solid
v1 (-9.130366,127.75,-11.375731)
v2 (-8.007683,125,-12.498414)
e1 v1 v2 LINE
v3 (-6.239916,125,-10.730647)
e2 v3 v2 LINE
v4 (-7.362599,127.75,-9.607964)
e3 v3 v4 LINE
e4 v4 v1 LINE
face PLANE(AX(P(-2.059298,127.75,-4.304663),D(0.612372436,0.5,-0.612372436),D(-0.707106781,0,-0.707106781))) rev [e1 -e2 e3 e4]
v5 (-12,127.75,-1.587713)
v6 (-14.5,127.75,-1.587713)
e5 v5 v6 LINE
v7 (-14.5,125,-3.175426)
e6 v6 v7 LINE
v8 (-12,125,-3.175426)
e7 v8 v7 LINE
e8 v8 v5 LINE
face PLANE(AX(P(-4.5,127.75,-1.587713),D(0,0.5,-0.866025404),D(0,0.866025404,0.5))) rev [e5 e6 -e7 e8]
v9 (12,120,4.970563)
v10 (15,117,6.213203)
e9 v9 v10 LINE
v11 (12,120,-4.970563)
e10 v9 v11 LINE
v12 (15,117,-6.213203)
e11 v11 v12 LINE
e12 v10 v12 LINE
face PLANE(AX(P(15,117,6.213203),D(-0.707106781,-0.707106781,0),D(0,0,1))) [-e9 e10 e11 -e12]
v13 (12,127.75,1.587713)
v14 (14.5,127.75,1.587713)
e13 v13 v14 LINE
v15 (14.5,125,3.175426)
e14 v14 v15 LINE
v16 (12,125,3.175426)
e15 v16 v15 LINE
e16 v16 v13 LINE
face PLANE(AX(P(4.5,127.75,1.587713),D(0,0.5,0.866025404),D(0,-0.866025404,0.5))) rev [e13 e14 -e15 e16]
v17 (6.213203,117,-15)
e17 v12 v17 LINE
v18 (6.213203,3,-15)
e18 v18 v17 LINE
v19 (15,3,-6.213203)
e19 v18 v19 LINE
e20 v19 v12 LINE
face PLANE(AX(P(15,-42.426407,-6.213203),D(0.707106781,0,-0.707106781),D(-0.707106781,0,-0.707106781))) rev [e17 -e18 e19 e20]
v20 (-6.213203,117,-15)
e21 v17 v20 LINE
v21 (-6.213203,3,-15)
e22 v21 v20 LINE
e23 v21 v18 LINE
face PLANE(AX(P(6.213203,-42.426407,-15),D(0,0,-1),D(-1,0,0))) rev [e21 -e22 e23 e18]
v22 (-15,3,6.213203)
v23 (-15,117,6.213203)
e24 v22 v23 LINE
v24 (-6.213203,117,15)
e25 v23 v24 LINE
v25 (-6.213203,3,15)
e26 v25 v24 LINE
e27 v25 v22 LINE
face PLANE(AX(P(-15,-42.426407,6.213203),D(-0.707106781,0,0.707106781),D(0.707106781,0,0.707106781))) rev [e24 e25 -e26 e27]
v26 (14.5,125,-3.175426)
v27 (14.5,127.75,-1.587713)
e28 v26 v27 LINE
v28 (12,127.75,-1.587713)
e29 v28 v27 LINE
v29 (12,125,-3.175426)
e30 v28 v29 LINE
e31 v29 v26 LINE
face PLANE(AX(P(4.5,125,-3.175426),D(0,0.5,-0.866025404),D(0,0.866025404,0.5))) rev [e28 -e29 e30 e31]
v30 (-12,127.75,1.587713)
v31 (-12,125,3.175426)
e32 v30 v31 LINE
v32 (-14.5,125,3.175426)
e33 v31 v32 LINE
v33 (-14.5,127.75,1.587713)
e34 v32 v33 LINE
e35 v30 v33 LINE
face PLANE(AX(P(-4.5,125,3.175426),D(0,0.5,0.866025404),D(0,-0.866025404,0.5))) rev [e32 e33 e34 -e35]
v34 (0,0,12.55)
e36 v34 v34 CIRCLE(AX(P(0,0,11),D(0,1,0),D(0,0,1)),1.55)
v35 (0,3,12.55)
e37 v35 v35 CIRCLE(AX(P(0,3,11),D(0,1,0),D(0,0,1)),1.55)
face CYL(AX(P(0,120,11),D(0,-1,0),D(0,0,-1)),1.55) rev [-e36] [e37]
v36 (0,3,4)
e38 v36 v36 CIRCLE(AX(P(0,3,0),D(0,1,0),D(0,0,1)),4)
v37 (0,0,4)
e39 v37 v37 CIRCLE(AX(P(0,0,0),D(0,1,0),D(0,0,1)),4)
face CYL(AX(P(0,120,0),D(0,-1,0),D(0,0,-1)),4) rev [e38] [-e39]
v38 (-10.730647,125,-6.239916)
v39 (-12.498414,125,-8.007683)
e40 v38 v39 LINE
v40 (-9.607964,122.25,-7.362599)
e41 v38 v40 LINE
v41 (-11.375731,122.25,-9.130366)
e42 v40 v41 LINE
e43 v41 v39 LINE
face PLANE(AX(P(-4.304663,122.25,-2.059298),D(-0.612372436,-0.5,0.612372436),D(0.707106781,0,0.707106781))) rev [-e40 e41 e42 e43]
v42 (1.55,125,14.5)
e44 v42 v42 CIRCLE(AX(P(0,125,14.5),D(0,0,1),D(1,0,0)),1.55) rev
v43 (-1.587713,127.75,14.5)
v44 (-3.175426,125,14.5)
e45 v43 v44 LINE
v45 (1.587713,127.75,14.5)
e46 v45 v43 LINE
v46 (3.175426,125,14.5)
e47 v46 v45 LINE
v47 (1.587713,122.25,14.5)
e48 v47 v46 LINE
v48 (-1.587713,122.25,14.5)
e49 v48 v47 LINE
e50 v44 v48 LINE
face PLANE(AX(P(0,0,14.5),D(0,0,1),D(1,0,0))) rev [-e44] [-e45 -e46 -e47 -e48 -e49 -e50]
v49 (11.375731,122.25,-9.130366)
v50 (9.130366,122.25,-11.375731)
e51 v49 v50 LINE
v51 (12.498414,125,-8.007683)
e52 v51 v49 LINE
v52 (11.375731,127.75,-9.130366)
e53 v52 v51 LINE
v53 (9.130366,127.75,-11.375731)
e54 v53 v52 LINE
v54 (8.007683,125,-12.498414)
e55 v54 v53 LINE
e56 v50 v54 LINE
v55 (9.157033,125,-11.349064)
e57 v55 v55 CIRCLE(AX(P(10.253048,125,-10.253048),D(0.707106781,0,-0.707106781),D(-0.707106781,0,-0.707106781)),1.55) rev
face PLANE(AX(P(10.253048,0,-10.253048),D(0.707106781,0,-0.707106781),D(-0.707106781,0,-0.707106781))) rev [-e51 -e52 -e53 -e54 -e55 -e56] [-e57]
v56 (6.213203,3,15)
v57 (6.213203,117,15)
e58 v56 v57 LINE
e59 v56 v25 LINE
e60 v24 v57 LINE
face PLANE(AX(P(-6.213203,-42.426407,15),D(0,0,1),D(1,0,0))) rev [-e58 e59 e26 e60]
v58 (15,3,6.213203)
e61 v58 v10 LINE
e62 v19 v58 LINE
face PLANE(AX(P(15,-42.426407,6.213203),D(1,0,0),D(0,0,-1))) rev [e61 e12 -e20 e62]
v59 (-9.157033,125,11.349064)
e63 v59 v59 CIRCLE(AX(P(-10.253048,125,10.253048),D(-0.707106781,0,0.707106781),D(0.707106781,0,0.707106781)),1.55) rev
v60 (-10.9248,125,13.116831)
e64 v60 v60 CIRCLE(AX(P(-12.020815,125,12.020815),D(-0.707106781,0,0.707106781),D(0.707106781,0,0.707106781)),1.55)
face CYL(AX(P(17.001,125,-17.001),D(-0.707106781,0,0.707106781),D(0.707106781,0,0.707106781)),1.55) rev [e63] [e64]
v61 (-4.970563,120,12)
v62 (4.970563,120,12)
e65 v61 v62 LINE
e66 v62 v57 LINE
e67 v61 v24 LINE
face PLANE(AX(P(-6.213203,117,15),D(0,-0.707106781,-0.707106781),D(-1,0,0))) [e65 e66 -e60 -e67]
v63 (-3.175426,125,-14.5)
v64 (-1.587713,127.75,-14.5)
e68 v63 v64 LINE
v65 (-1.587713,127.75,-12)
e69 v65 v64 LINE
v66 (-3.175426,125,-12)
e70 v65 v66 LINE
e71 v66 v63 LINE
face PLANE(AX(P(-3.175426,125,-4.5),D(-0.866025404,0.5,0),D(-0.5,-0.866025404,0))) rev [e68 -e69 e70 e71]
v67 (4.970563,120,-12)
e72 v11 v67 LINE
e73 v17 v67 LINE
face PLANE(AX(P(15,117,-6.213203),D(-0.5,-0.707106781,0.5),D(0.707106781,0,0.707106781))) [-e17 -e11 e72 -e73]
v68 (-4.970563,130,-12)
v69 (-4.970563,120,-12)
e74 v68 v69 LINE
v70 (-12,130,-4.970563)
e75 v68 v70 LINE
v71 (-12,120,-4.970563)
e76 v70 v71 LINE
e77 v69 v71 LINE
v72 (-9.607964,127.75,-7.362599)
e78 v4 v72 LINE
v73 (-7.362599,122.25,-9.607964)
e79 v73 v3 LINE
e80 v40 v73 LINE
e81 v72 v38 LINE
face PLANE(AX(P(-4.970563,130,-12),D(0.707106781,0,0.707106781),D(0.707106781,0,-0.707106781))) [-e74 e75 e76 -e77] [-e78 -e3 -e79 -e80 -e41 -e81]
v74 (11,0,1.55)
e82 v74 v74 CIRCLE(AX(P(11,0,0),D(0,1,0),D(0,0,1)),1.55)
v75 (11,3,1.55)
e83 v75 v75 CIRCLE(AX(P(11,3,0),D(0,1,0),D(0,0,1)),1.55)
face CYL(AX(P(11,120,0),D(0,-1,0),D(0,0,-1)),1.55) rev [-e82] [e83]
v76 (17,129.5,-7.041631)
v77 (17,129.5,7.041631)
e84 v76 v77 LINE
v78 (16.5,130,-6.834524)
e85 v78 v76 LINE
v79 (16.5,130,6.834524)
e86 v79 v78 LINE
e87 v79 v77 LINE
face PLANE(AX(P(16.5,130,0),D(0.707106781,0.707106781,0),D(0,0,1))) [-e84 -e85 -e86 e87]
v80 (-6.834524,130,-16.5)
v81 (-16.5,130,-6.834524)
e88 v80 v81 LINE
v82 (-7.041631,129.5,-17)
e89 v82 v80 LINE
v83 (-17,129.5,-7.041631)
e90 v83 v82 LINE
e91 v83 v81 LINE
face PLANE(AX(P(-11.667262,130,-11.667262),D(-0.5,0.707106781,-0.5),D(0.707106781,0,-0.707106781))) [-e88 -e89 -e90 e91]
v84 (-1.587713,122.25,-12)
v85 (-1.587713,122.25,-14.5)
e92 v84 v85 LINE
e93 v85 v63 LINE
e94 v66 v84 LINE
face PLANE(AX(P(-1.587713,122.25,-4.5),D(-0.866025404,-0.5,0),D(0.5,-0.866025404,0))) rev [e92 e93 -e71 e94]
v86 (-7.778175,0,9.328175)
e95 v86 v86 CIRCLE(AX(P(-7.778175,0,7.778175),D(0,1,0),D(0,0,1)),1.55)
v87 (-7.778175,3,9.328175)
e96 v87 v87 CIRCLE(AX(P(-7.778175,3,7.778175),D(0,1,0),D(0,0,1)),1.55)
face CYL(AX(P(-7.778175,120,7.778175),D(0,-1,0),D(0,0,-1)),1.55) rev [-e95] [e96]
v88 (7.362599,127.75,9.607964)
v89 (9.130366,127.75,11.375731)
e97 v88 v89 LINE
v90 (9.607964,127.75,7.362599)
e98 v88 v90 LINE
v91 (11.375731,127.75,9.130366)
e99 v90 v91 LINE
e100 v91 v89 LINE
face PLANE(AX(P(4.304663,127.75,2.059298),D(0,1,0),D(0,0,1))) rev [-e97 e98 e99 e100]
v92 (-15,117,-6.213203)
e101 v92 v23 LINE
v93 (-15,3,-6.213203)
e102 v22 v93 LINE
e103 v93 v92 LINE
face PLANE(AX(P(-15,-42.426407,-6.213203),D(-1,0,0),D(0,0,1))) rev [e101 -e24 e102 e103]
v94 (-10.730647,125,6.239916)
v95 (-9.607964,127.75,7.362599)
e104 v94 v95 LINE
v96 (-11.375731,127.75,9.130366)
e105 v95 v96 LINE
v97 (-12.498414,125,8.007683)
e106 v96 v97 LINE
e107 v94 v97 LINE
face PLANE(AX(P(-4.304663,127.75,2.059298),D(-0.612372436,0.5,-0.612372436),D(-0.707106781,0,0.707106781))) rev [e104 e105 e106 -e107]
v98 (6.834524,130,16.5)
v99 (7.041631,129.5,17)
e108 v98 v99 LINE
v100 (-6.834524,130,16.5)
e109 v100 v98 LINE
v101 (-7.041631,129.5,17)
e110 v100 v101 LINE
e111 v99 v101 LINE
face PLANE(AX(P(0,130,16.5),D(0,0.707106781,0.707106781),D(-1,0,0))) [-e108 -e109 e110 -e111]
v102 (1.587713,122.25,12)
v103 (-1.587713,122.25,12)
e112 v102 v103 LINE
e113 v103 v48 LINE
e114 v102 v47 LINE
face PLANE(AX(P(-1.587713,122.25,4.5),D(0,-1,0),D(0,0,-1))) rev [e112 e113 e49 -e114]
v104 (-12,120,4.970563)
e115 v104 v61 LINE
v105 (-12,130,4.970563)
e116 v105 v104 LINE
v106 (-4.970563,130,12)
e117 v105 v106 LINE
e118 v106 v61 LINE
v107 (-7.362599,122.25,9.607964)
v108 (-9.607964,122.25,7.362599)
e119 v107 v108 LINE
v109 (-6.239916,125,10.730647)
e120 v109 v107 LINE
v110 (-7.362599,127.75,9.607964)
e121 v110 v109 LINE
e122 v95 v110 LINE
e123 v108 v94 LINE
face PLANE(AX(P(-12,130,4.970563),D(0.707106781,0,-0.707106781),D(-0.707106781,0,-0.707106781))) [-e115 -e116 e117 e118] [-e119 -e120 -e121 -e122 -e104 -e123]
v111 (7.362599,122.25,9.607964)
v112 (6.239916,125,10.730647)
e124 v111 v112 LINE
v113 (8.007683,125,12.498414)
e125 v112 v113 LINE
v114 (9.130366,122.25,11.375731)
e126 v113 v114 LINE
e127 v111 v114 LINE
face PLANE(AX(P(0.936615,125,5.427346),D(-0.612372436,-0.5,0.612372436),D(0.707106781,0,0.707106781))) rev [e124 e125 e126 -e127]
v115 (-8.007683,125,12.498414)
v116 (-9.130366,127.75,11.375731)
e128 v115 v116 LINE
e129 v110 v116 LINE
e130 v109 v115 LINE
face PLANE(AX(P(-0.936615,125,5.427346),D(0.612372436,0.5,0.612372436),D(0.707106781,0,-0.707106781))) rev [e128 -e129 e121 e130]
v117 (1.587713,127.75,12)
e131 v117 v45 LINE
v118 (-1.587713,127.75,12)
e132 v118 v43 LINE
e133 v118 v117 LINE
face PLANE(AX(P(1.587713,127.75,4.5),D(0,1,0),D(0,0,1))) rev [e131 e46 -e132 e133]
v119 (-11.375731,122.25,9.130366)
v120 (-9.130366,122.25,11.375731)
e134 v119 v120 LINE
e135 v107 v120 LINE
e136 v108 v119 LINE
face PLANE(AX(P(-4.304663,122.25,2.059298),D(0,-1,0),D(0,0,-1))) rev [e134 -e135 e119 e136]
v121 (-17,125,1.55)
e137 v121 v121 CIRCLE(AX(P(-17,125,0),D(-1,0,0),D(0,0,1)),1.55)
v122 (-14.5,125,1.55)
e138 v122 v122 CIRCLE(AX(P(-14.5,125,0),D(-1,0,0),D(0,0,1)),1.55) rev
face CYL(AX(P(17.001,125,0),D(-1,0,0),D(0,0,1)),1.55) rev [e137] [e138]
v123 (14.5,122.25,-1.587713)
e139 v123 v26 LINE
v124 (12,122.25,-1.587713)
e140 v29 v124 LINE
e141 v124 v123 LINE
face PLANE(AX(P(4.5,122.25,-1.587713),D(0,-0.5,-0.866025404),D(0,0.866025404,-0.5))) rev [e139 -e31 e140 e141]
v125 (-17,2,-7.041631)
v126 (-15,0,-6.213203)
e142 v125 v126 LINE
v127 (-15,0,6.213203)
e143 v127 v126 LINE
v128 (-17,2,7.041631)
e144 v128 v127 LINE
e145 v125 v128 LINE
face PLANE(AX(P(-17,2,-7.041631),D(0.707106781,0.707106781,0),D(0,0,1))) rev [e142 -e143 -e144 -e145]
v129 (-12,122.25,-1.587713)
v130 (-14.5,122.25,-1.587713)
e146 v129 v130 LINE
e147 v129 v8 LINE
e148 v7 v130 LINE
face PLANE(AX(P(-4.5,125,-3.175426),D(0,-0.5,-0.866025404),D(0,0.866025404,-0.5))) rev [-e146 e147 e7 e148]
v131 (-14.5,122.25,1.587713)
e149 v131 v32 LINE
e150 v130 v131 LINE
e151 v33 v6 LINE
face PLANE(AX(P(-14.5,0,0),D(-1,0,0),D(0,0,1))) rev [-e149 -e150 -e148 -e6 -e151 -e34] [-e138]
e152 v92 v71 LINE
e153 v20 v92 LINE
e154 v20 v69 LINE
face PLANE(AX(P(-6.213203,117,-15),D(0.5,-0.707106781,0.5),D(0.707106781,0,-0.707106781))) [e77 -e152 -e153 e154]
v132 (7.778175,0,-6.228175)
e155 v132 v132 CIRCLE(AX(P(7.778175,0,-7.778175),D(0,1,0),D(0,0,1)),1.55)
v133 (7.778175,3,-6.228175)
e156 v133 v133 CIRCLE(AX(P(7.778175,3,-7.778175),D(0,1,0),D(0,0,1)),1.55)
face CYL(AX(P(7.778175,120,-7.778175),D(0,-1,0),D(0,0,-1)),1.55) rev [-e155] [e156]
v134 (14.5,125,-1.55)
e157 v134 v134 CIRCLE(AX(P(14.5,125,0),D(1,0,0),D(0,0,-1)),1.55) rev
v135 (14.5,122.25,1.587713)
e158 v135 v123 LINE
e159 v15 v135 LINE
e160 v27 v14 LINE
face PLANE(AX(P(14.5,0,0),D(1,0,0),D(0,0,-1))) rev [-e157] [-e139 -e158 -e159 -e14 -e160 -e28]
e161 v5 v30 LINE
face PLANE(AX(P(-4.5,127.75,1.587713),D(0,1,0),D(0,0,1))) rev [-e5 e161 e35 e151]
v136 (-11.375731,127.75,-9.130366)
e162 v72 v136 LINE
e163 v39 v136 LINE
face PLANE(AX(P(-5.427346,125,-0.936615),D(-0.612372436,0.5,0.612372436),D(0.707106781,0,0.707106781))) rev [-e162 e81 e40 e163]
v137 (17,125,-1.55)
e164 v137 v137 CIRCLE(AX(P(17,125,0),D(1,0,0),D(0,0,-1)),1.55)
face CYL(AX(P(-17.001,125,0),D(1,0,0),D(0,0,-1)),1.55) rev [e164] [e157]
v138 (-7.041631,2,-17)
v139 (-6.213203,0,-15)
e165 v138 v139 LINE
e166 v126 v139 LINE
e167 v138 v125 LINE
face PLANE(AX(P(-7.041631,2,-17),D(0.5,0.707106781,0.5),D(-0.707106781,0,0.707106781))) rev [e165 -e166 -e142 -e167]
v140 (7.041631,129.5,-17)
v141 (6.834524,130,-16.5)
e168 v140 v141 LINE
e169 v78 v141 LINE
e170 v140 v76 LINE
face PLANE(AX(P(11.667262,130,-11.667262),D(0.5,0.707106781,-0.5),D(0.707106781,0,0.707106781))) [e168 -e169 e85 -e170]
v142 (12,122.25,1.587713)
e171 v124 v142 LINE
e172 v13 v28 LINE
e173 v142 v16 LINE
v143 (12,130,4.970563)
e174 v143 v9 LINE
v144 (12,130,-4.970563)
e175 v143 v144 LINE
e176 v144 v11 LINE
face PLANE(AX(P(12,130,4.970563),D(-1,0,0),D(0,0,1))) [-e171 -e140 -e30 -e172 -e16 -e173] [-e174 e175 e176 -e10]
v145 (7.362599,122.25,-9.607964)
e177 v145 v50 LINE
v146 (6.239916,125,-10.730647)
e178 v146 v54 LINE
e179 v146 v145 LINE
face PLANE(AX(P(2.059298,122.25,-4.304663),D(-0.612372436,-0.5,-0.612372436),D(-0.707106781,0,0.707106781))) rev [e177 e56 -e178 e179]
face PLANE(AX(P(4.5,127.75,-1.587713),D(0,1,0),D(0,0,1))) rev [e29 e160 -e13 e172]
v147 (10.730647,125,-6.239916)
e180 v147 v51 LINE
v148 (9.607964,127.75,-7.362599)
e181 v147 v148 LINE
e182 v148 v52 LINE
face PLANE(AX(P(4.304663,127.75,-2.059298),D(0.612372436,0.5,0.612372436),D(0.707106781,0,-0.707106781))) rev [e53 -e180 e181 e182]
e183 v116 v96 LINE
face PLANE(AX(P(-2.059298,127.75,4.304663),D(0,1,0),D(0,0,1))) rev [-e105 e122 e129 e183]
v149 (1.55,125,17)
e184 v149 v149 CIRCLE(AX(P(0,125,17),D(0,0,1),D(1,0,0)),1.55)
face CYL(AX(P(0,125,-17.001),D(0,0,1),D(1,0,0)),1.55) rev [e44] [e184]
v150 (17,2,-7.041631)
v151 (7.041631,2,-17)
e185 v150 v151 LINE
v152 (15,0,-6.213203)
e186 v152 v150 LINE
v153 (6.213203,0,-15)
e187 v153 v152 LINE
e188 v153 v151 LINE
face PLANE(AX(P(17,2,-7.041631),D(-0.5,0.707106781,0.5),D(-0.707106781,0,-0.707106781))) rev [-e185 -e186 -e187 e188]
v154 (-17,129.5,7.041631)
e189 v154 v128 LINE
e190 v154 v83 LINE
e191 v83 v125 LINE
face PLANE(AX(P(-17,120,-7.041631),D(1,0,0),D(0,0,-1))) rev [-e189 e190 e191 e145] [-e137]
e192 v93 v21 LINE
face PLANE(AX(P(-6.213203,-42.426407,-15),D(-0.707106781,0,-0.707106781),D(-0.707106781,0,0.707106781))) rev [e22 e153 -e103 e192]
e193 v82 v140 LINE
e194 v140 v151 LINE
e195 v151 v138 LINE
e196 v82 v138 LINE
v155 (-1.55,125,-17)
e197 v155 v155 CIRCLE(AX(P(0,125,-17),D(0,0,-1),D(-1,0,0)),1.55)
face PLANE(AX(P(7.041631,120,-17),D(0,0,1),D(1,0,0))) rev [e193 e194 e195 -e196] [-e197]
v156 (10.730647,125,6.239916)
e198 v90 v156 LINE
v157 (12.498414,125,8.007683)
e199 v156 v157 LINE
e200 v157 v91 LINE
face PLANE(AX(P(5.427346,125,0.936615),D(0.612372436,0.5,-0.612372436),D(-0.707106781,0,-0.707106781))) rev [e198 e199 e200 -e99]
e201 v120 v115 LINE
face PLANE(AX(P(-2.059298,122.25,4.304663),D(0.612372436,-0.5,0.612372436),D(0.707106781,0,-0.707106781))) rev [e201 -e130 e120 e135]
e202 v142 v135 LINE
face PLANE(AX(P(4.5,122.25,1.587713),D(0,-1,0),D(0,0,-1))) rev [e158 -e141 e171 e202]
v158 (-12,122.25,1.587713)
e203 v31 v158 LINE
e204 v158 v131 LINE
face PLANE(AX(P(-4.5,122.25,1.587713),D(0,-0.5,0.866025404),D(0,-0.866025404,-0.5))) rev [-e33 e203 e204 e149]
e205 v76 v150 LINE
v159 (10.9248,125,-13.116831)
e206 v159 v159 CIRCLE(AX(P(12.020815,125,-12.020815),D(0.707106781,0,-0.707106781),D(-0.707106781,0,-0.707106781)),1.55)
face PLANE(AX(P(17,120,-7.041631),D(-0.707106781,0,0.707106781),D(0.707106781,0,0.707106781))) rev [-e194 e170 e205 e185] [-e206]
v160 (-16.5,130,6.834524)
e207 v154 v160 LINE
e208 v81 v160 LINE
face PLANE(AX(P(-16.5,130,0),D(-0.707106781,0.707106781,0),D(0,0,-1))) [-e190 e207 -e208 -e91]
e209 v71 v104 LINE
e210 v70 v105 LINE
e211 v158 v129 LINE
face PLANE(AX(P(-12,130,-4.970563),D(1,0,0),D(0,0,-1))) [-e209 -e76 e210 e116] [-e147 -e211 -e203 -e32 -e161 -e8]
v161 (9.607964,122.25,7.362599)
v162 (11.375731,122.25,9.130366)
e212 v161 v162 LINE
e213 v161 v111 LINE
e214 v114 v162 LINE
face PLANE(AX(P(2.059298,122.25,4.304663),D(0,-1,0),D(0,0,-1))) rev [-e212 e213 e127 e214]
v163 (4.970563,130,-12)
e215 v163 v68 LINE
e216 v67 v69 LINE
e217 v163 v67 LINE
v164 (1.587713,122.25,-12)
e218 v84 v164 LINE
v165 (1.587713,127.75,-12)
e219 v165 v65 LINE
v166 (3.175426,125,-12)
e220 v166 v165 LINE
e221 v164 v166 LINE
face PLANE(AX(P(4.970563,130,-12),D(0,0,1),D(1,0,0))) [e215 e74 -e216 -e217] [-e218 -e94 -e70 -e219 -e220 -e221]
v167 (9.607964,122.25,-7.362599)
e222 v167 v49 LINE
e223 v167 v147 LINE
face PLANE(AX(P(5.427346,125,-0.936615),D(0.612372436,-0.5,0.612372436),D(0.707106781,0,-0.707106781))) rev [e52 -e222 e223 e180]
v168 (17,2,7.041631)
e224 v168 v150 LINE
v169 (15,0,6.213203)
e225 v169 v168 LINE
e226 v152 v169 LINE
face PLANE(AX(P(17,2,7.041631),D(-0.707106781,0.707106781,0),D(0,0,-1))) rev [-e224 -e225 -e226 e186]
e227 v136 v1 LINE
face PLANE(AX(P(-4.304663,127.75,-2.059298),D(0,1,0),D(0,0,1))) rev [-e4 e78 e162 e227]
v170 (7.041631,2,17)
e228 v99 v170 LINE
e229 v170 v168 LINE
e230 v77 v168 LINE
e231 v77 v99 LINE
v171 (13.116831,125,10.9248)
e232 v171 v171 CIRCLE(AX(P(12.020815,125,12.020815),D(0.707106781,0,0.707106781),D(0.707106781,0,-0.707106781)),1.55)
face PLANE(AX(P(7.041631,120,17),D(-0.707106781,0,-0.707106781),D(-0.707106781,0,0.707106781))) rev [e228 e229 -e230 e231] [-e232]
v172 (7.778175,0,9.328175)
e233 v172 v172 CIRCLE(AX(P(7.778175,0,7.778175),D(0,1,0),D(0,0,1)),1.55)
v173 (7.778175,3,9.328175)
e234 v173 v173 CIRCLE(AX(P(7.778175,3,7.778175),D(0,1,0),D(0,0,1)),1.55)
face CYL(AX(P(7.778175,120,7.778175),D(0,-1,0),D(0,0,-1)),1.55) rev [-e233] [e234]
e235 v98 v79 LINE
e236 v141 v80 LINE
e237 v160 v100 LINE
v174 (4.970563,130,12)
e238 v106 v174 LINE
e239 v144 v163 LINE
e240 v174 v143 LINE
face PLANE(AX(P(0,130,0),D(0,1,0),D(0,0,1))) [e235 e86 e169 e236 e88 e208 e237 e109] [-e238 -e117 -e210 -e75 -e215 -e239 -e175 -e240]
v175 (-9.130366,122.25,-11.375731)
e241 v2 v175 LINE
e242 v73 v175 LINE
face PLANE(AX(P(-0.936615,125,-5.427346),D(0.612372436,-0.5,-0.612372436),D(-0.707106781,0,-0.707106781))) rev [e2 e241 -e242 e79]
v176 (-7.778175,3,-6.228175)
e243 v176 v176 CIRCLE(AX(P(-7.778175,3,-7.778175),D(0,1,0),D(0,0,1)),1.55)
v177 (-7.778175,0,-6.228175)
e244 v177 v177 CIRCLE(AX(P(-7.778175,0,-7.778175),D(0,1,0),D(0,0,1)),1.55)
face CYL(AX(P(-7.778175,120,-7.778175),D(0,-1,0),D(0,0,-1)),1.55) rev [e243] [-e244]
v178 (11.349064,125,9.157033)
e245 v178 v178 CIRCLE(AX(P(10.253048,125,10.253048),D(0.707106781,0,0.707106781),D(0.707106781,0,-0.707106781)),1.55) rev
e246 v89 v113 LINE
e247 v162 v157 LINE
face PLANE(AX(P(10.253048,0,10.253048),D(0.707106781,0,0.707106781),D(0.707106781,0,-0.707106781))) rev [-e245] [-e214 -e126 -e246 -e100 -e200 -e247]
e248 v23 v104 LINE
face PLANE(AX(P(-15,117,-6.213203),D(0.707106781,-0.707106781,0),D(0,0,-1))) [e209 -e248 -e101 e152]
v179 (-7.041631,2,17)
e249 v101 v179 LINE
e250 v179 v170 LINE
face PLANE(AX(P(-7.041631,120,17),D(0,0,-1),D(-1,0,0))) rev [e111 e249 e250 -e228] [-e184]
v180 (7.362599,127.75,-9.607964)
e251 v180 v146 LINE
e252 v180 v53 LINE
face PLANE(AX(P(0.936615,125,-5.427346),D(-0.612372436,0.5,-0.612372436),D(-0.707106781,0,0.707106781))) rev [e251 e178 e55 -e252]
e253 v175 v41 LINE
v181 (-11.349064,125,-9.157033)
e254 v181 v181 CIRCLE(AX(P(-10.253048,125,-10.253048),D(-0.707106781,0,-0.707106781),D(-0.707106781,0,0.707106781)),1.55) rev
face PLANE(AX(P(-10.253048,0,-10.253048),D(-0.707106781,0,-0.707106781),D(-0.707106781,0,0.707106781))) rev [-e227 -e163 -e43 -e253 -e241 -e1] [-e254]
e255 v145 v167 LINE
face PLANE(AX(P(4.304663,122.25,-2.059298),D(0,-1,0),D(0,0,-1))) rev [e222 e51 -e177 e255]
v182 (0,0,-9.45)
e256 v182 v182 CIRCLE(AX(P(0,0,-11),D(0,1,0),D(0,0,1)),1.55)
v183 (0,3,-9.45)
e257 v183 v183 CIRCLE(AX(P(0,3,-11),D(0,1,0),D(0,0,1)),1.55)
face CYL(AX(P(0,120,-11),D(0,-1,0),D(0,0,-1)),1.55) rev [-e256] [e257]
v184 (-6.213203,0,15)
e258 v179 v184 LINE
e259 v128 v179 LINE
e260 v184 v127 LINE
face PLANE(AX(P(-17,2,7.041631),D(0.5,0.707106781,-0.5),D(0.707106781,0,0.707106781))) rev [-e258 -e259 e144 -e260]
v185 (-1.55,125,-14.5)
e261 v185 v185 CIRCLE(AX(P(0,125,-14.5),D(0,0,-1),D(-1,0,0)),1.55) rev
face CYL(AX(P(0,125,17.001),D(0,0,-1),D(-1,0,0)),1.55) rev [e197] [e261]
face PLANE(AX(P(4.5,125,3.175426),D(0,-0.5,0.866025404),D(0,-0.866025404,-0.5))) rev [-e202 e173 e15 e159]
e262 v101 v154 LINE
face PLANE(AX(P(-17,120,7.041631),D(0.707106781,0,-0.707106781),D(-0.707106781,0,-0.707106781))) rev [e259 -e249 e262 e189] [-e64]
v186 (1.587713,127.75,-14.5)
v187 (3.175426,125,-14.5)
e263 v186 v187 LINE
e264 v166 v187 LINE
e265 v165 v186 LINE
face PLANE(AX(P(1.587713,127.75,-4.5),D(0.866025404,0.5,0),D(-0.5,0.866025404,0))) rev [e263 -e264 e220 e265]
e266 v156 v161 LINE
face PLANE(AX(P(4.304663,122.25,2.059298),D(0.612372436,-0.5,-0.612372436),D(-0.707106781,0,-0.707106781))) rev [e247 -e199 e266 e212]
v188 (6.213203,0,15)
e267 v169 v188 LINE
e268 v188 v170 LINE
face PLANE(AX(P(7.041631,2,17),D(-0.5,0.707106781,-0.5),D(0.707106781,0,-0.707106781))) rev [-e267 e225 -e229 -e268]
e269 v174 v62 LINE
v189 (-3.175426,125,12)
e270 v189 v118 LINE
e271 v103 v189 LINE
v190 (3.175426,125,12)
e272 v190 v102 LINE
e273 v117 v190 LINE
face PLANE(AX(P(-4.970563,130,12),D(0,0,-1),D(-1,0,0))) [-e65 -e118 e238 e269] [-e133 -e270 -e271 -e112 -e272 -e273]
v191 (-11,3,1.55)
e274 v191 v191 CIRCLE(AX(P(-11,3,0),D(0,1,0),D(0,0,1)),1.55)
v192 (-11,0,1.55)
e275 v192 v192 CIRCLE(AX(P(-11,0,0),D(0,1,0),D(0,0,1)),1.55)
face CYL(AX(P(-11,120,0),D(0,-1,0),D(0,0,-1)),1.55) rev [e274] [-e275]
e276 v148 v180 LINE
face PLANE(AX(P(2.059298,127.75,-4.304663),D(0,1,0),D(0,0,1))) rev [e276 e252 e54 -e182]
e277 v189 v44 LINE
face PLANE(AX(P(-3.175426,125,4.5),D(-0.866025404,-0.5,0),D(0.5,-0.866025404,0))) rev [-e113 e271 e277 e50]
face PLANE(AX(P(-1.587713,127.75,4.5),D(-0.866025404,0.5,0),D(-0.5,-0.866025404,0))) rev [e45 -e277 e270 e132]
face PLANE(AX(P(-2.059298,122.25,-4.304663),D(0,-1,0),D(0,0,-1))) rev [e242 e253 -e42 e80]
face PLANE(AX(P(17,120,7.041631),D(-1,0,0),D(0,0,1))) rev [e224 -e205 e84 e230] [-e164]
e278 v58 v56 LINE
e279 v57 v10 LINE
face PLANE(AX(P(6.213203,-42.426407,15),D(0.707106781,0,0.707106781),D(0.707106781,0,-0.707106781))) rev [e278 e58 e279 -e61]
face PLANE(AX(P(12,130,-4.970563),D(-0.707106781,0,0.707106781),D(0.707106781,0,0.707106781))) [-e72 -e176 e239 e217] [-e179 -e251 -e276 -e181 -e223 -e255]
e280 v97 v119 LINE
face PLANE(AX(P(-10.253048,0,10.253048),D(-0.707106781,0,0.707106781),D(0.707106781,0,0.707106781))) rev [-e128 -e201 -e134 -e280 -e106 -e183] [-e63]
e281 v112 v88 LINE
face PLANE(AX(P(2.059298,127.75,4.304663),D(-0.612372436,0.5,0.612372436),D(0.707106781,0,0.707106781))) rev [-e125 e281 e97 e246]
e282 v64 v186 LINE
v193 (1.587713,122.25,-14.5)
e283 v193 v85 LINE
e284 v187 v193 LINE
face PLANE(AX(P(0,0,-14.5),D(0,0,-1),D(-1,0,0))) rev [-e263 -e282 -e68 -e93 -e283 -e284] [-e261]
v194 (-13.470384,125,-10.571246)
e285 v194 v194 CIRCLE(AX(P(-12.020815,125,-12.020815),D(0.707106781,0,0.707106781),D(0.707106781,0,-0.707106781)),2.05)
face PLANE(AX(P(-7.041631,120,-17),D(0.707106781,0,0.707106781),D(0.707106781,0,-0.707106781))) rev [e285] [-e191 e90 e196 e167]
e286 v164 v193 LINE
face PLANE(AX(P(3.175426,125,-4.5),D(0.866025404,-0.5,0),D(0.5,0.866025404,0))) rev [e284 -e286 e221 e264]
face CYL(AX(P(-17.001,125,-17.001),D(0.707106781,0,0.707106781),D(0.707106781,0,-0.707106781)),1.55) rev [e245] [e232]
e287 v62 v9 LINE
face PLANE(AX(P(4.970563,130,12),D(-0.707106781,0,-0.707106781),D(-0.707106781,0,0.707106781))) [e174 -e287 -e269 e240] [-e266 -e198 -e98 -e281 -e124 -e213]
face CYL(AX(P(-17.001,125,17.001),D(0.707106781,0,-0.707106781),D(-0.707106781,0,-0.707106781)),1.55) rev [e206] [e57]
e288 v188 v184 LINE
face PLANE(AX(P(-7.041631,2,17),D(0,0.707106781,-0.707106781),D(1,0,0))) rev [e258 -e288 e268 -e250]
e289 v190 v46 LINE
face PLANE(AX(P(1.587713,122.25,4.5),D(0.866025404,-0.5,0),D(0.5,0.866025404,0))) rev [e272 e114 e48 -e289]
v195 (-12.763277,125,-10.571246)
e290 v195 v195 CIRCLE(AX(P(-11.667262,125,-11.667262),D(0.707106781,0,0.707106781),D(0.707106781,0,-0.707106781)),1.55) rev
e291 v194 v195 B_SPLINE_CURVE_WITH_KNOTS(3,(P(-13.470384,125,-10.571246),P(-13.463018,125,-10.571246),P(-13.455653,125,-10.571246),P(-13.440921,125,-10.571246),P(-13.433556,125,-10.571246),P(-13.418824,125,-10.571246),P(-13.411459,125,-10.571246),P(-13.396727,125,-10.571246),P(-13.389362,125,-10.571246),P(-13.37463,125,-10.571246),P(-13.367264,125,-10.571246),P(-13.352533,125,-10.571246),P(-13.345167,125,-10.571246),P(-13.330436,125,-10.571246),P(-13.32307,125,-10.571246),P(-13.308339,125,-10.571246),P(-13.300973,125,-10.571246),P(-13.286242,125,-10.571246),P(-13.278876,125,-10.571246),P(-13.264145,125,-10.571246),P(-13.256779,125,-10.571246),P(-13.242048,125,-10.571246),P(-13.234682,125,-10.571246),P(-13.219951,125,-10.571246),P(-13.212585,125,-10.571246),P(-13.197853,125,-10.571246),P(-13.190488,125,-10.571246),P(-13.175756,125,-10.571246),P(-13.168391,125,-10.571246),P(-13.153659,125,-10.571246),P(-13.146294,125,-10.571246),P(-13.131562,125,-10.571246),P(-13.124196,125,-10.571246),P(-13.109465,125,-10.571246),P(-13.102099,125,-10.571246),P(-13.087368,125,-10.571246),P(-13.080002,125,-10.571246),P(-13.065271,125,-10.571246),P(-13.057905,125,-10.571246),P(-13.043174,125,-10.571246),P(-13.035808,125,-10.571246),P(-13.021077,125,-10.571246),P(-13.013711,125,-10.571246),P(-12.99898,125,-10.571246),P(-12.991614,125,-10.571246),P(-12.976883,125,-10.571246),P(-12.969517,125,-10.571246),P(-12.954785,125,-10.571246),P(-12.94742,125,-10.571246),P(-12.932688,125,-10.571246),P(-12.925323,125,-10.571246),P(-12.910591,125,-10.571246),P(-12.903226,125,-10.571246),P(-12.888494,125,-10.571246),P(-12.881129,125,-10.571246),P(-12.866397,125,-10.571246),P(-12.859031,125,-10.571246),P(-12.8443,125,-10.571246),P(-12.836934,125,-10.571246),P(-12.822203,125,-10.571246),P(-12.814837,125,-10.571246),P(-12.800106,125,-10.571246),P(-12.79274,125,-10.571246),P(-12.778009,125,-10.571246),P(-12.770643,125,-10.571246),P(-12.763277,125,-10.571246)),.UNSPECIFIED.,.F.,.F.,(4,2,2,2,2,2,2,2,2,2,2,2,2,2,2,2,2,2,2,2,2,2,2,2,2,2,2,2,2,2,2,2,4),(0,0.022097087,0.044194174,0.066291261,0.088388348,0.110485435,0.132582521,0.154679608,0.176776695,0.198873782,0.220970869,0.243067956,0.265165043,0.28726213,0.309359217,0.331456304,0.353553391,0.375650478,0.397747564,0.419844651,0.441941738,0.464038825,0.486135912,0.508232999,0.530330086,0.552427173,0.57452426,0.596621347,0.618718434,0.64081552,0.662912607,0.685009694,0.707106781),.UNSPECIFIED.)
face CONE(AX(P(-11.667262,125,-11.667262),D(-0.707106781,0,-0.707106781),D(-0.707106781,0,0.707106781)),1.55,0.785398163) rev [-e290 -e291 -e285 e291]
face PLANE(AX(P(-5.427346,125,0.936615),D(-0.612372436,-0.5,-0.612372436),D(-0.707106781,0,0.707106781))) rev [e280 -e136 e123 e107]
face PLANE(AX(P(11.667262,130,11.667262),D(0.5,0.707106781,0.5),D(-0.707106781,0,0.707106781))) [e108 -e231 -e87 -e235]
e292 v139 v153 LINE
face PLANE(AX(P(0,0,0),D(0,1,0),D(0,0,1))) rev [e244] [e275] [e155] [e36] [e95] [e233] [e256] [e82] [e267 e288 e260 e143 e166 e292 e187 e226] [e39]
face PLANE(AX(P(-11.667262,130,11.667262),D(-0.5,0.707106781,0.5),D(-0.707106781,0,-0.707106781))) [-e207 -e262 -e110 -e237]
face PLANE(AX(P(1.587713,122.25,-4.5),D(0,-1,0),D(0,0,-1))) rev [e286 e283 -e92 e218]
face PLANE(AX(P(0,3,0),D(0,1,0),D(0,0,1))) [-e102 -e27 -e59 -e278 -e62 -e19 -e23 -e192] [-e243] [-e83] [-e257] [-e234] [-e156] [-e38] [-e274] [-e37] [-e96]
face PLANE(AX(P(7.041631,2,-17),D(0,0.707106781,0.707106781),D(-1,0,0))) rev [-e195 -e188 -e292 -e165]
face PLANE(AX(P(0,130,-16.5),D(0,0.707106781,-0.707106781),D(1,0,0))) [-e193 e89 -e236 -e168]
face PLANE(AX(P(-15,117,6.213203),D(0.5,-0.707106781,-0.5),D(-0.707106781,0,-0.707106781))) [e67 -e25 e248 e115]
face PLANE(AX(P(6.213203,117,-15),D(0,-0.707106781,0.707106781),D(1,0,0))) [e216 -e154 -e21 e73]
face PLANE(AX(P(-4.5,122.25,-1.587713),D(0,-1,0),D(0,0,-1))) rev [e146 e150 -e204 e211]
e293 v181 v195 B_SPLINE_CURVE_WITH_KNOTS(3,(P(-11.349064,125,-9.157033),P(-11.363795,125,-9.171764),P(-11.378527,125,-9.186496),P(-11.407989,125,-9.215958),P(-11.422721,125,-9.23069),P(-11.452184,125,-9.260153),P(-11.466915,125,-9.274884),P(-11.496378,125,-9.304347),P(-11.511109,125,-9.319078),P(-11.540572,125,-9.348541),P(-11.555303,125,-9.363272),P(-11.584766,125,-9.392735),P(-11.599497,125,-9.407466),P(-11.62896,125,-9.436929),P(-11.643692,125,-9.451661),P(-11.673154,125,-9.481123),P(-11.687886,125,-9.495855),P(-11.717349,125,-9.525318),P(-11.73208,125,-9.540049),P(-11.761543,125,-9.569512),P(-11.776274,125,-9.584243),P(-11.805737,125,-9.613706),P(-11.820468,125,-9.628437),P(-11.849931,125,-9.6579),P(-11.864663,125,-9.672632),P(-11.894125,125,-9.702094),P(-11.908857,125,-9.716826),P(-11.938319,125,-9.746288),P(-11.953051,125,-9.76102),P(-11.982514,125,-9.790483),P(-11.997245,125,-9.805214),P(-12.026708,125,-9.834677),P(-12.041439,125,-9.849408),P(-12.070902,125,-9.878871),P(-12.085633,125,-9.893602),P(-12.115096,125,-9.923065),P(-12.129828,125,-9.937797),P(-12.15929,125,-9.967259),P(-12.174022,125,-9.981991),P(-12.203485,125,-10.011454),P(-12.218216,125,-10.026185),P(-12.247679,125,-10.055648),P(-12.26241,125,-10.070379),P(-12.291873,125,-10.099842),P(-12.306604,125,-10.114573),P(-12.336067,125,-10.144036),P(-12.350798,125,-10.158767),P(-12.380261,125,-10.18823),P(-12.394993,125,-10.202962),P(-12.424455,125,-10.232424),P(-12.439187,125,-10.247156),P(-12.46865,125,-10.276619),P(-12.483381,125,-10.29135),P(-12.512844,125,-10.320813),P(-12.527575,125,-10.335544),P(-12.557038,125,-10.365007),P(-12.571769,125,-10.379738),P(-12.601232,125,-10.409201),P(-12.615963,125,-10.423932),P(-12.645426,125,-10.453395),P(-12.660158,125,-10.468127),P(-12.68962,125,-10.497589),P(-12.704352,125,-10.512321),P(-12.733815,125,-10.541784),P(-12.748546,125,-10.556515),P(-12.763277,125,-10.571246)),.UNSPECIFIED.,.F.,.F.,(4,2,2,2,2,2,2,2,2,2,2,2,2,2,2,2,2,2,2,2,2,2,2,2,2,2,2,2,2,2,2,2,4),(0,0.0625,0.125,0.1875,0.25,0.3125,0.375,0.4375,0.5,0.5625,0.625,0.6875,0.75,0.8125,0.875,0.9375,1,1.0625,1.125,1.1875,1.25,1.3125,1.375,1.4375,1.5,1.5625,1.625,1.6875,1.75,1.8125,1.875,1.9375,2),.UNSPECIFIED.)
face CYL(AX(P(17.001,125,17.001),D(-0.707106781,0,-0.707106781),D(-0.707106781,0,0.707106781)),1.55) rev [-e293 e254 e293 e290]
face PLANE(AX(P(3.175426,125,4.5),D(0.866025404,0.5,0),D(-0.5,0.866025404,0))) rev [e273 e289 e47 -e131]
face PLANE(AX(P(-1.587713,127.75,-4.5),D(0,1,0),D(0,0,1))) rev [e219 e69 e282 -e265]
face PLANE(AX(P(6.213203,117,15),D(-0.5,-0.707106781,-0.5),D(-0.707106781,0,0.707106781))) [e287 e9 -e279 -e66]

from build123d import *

# Parameters (mm, degrees)
CROQUIS1_R              = 1.55
CROQUIS1_R_2            = 4
SALIENTE_EXTRUIR1_DEPTH = 120
CORTAR_EXTRUIR1_DEPTH   = 117
SALIENTE_EXTRUIR2_DEPTH = 10
CHAFL_N2_SIZE           = 3
CORTAR_EXTRUIR2_REACH   = 138.325
CROQUIS4_R              = 1.55
CHAFL_N3_SIZE           = 0.5
CORTAR_EXTRUIR3_START   = -2.5
CORTAR_EXTRUIR3_DEPTH   = 10
MATRIZC5_COUNT          = 8
CHAFL_N1_SIZE           = 2
CHAFL_N4_SIZE           = 0.5


with BuildPart() as part:
    # Croquis1 → Saliente-Extruir1 (new body)
    with BuildSketch(Plane(origin=(0, 0, 0), x_dir=(1, 0, 0), z_dir=(0, 1, 0))):
        Polygon((17, -7.04163056), (17, 7.04163056), (7.04163056, 17), (-7.04163056, 17), (-17, 7.04163056), (-17, -7.04163056), (-7.04163056, -17), (7.04163056, -17), align=None)
        with Locations(Location((0, 11, 0), (0, 0, 270))):
            Circle(CROQUIS1_R, mode=Mode.SUBTRACT)
        with Locations(Location((0, 0, 0), (0, 0, 270))):
            Circle(CROQUIS1_R_2, mode=Mode.SUBTRACT)
        with Locations(Location((7.778174593, 7.778174593, 0), (0, 0, 270))):
            Circle(CROQUIS1_R, mode=Mode.SUBTRACT)
        with Locations(Location((11, 0, 0), (0, 0, 270))):
            Circle(CROQUIS1_R, mode=Mode.SUBTRACT)
        with Locations(Location((7.778174593, -7.778174593, 0), (0, 0, 270))):
            Circle(CROQUIS1_R, mode=Mode.SUBTRACT)
        with Locations(Location((0, -11, 0), (0, 0, 270))):
            Circle(CROQUIS1_R, mode=Mode.SUBTRACT)
        with Locations(Location((-7.778174593, -7.778174593, 0), (0, 0, 270))):
            Circle(CROQUIS1_R, mode=Mode.SUBTRACT)
        with Locations(Location((-11, 0, 0), (0, 0, 270))):
            Circle(CROQUIS1_R, mode=Mode.SUBTRACT)
        with Locations(Location((-7.778174593, 7.778174593, 0), (0, 0, 270))):
            Circle(CROQUIS1_R, mode=Mode.SUBTRACT)
    extrude(amount=SALIENTE_EXTRUIR1_DEPTH)

    # Croquis2 → Cortar-Extruir1 (cut)
    with BuildSketch(Plane(origin=(0, 120, 0), x_dir=(1, 0, 0), z_dir=(0, 1, 0))):
        Polygon((6.213203436, 15), (-6.213203436, 15), (-15, 6.213203436), (-15, -6.213203436), (-6.213203436, -15), (6.213203436, -15), (15, -6.213203436), (15, 6.213203436), align=None)
    extrude(amount=-CORTAR_EXTRUIR1_DEPTH, mode=Mode.SUBTRACT)

    # Croquis3 → Saliente-Extruir2 (add)
    with BuildSketch(Plane(origin=(0, 120, 0), x_dir=(1, 0, 0), z_dir=(0, 1, 0))):
        Polygon((7.04163056, 17), (-7.04163056, 17), (-17, 7.04163056), (-17, -7.04163056), (-7.04163056, -17), (7.04163056, -17), (17, -7.04163056), (17, 7.04163056), align=None)
        Polygon((12, -4.970562748), (12, 4.970562748), (4.970562748, 12), (-4.970562748, 12), (-12, 4.970562748), (-12, -4.970562748), (-4.970562748, -12), (4.970562748, -12), align=None, mode=Mode.SUBTRACT)
    extrude(amount=SALIENTE_EXTRUIR2_DEPTH)

    # Chaflán2
    chafl_n2_edges = [part.edges().sort_by_distance(p)[0] for p in [
        (10.606601718, 120, -10.606601718),
        (0, 120, -15),
        (-10.606601718, 120, -10.606601718),
        (-15, 120, 0),
        (-10.606601718, 120, 10.606601718),
        (0, 120, 15),
        (10.606601718, 120, 10.606601718),
        (15, 120, 0),
    ]]
    chamfer(chafl_n2_edges, length=CHAFL_N2_SIZE - 0.0001)  # a hair under: the kernel refuses the full size

    # Croquis4 → Cortar-Extruir2 (cut, up to next)
    with BuildSketch(Plane(origin=(-12.02081528, 0, -12.02081528), x_dir=(-0.7071067811865472, 0, 0.7071067811865478), z_dir=(-0.7071067811865478, 0, -0.7071067811865472)), mode=Mode.PRIVATE) as cortar_extruir2_sk1:
        with Locations((0, 125)):
            Circle(CROQUIS4_R)
    cortar_extruir2_tool1 = extrude(cortar_extruir2_sk1.sketch, amount=-CORTAR_EXTRUIR2_REACH, mode=Mode.PRIVATE) & part.part
    cortar_extruir2 = cortar_extruir2_tool1.solids().sort_by_distance((-12.020815, 125, -12.020815))[0]
    add(cortar_extruir2, mode=Mode.SUBTRACT)

    # Chaflán3
    chafl_n3_edges = [part.edges().sort_by_distance(p)[0] for p in [
        (-10.924799769, 125, -13.116830791),
    ]]
    chamfer(chafl_n3_edges, length=CHAFL_N3_SIZE)

    # Croquis5 → Cortar-Extruir3 (cut)
    with BuildSketch(Plane(origin=(-12.02081528, 0, -12.02081528), x_dir=(-0.7071067811865471, 0, 0.7071067811865479), z_dir=(-0.7071067811865479, 0, -0.7071067811865471)).offset(CORTAR_EXTRUIR3_START)):
        Polygon((3.175426481, 125), (1.58771324, 127.75), (-1.58771324, 127.75), (-3.175426481, 125), (-1.58771324, 122.25), (1.58771324, 122.25), align=None)
    cortar_extruir3 = extrude(amount=-CORTAR_EXTRUIR3_DEPTH, mode=Mode.SUBTRACT)

    # MatrizC5: Cortar-Extruir2, Cortar-Extruir3 ×8 about axis
    matrizc5_axis = Axis((0, 0, 0), (0, 1, 0))
    add([cortar_extruir2.rotate(matrizc5_axis, i * 360 / MATRIZC5_COUNT) for i in range(1, MATRIZC5_COUNT)], mode=Mode.SUBTRACT)
    add([cortar_extruir3.rotate(matrizc5_axis, i * 360 / MATRIZC5_COUNT) for i in range(1, MATRIZC5_COUNT)], mode=Mode.SUBTRACT)

    # Chaflán1
    chafl_n1_edges = [part.edges().sort_by_distance(p)[0] for p in [
        (17, 0, 0),
        (12.02081528, 0, 12.02081528),
        (0, 0, 17),
        (-12.02081528, 0, 12.02081528),
        (-17, 0, 0),
        (-12.02081528, 0, -12.02081528),
        (0, 0, -17),
        (12.02081528, 0, -12.02081528),
    ]]
    chamfer(chafl_n1_edges, length=CHAFL_N1_SIZE)

    # Chaflán4
    chafl_n4_edges = [part.edges().sort_by_distance(p)[0] for p in [
        (12.02081528, 130, -12.02081528),
        (0, 130, -17),
        (-12.02081528, 130, -12.02081528),
        (-17, 130, 0),
        (-12.02081528, 130, 12.02081528),
        (0, 130, 17),
        (12.02081528, 130, 12.02081528),
        (17, 130, 0),
    ]]
    chamfer(chafl_n4_edges, length=CHAFL_N4_SIZE)


solid = part.part
